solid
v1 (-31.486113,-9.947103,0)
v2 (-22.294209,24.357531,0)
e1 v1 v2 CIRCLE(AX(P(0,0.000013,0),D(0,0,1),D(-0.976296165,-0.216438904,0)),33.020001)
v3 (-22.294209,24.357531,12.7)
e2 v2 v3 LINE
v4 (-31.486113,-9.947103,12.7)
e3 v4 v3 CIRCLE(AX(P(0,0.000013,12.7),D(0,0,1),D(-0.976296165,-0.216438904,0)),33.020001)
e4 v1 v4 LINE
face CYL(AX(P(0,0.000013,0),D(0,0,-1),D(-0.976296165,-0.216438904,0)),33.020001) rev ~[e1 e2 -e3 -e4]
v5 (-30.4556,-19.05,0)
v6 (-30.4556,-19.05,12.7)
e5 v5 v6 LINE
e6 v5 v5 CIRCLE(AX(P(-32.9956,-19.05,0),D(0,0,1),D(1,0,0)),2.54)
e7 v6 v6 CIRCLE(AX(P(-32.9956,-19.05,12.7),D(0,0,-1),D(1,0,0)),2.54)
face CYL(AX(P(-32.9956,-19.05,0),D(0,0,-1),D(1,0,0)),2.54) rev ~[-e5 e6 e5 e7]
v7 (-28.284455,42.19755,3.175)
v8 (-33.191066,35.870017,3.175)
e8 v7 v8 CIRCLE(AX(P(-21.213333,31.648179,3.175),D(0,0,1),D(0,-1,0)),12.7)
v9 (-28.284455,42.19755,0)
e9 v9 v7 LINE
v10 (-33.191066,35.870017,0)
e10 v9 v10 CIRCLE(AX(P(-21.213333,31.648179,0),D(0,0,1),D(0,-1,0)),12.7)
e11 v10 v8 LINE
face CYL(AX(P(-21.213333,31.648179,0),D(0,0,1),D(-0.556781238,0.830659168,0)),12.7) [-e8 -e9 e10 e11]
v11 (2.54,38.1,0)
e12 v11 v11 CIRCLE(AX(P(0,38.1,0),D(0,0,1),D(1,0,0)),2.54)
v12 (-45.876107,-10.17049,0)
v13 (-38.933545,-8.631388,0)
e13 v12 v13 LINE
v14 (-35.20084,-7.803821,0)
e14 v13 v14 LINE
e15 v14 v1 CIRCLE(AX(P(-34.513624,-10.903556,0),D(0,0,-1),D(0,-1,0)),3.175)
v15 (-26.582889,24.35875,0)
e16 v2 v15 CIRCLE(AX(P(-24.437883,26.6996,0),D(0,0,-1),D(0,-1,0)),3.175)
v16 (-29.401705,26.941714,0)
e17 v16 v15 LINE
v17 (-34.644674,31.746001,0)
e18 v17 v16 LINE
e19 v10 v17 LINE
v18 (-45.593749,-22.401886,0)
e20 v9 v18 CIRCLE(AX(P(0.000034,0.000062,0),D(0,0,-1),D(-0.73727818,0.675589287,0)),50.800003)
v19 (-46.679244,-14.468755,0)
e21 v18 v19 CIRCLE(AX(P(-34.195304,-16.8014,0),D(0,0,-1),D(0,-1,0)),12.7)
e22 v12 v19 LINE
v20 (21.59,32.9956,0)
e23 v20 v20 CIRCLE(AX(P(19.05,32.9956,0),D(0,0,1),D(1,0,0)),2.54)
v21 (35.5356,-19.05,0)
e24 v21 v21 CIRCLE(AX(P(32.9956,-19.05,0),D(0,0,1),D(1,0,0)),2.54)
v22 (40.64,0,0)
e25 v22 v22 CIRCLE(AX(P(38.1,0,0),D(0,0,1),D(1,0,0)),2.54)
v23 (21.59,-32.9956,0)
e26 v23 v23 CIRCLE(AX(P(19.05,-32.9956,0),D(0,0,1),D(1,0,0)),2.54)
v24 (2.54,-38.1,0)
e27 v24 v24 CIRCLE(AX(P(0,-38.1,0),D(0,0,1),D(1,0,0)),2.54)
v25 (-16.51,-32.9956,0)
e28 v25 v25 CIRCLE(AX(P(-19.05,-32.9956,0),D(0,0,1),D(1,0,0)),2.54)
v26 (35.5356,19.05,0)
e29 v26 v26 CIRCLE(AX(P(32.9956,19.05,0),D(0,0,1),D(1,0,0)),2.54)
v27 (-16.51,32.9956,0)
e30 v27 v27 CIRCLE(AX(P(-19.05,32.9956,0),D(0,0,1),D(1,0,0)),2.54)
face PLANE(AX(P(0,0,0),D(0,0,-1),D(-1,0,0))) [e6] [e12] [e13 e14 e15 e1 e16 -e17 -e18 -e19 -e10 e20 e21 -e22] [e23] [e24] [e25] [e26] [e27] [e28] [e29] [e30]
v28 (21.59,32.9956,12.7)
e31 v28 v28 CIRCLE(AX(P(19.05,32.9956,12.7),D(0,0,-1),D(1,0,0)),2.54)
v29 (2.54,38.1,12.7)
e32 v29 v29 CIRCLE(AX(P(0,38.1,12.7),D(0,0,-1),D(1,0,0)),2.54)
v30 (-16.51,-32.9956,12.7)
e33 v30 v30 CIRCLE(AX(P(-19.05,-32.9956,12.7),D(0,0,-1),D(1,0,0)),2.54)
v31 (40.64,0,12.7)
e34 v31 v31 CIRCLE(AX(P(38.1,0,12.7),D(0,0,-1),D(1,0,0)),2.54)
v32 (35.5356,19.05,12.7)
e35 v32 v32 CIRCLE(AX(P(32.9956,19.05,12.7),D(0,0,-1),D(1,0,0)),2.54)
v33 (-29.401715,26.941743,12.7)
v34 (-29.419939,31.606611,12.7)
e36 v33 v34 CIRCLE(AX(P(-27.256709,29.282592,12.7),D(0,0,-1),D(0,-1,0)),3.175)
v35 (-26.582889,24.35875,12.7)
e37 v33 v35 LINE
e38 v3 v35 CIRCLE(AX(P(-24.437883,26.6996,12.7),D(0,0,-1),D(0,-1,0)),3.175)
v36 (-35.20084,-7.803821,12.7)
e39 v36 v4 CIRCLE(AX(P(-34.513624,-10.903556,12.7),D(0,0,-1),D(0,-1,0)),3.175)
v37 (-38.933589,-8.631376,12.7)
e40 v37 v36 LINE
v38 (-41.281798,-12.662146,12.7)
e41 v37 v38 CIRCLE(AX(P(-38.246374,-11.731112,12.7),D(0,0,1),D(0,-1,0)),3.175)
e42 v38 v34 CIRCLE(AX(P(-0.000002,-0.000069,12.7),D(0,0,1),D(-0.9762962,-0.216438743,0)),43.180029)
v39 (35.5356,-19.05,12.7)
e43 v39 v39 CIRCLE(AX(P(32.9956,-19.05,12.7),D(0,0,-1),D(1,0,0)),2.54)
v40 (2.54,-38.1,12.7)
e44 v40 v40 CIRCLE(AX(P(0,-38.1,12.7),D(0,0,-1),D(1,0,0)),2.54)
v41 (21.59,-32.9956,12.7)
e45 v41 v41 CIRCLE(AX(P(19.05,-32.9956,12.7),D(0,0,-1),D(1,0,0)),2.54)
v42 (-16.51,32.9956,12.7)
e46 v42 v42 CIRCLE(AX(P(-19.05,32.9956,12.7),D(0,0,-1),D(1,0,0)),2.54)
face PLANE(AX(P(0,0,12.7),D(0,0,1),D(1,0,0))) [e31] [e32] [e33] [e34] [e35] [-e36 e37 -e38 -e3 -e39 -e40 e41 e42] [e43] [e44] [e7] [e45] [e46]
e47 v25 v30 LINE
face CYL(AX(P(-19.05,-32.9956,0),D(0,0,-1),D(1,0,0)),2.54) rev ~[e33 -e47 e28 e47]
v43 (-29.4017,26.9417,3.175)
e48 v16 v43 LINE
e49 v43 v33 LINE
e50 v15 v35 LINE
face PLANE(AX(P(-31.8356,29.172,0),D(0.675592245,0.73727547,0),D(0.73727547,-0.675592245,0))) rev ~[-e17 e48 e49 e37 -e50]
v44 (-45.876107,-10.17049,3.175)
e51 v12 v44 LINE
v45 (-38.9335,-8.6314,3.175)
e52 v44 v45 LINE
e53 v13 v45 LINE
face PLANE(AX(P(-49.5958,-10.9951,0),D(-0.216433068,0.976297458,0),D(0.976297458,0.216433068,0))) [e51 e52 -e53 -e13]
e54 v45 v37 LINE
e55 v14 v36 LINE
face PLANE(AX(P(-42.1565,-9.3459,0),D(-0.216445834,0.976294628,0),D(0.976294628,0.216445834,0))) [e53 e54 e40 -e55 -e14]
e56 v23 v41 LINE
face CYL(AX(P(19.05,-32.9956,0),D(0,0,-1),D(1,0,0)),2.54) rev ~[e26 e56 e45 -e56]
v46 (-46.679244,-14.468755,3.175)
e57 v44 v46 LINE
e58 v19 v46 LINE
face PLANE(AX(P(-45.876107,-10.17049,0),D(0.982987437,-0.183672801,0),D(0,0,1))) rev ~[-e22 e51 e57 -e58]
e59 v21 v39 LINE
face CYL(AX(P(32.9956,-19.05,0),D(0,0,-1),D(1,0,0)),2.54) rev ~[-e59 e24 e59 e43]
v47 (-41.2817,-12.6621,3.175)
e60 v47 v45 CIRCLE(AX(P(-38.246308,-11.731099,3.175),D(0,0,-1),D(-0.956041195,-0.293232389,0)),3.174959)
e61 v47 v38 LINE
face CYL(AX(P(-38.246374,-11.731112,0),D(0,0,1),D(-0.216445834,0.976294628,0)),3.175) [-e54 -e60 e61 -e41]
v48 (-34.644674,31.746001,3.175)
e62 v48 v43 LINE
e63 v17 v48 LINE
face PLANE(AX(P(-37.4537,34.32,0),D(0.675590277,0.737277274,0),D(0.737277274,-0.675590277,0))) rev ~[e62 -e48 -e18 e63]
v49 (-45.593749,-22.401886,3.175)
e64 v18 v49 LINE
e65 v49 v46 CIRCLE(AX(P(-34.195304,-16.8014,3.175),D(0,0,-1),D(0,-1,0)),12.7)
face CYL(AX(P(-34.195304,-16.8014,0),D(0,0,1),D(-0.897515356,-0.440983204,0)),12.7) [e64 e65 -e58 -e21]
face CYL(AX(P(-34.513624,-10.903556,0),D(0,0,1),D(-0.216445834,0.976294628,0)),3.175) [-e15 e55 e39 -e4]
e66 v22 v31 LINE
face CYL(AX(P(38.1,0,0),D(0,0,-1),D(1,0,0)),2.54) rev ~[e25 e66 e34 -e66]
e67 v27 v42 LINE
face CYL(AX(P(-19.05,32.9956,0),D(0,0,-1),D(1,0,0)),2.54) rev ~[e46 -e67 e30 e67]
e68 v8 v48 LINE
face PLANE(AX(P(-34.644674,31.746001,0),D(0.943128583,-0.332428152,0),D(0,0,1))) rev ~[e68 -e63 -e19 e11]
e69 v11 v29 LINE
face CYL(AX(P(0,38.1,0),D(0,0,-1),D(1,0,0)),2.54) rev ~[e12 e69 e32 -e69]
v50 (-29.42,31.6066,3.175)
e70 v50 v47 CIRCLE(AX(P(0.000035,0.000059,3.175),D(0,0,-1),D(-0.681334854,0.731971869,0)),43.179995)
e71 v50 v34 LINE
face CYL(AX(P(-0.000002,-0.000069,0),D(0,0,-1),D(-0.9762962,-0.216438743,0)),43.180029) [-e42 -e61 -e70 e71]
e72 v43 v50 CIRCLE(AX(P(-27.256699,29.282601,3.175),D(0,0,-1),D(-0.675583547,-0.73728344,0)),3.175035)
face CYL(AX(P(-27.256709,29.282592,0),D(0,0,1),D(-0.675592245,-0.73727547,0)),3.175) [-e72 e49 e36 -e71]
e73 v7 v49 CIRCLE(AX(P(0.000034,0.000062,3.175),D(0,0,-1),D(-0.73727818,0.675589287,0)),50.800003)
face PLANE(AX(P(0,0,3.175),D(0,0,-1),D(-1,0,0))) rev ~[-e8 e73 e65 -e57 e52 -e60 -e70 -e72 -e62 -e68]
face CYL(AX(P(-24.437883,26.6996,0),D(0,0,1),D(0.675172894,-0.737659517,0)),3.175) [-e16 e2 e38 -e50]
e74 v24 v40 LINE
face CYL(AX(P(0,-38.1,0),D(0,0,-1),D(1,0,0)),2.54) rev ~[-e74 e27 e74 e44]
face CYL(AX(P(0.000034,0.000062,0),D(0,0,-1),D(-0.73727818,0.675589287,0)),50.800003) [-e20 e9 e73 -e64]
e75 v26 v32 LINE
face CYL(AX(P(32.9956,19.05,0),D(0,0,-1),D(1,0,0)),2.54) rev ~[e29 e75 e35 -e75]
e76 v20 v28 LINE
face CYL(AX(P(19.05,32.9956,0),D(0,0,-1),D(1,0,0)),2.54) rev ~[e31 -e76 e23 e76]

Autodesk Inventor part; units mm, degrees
ref_plane "YZ Plane" through (0, 0, 0) normal (1, 0, 0) x (0, 1, 0)
ref_plane "XZ Plane" through (0, 0, 0) normal (0, 1, 0) x (-1, 0, 0)
ref_plane "XY Plane" through (0, 0, 0) normal (0, 0, 1) x (1, 0, 0)
sketch "Sketch1" plane through (0, 0, 0) normal (0, 0, 1) x (1, 0, 0)
  circle A0 centre (0, 38.1) radius 2.54
  circle A1 centre (-19.05, 32.9956) radius 2.54
  circle A2 centre (-32.9956, 19.05) radius 2.54
  circle A3 centre (-38.1, 0) radius 2.54
  arc A4 (-34.7393, -15.6458) -> (-25.6134, 28.2057) centre (0, 0) ccw
  line L0 (0, 0) -> (-22.4665, 0)
  arc A5 (-42.1565, -9.3459) -> (-31.8356, 29.172) centre (0, 0) ccw
  arc A6 (-32.2373, -7.1468) -> (-24.3449, 22.308) centre (0, 0) ccw
  line L1 (-31.8356, 29.172) -> (-24.3449, 22.308)
  line L2 (-42.1565, -9.3459) -> (-32.2373, -7.1468)
  circle A7 centre (-32.9956, -19.05) radius 2.54
  circle A8 centre (-19.05, -32.9956) radius 2.54
  circle A9 centre (0, -38.1) radius 2.54
  circle A10 centre (19.05, -32.9956) radius 2.54
  circle A11 centre (32.9956, -19.05) radius 2.54
  circle A12 centre (38.1, 0) radius 2.54
  circle A13 centre (32.9956, 19.05) radius 2.54
  circle A14 centre (19.05, 32.9956) radius 2.54
  dimension "d0" = 38.1
  dimension "d3" = 360
  dimension "d5" = 5.08
  dimension "d6" = 5.08
  dimension "d7" = 5.08
  dimension "d8" = 55
  dimension "d9" = 42.5
extrude "Extrusion1" add sketch "Sketch1" along normal blind 12.7 contours L2 A6 L1 A5
fillet "Fillet2" radius 3.175 4 edges at (-31.8356, 29.172, 6.35) (-24.3449, 22.308, 6.35) (-32.2373, -7.1468, 6.35) (-42.1565, -9.3459, 6.35)
sketch "Sketch2" plane through (0, 0, 0) normal (0, 0, -1) x (-1, 0, 0)
  arc A0 (29.42, 31.6066) -> (41.2817, -12.6621) centre (0, 0) ccw projected
  arc A1 (37.4537, 34.32) -> (49.5958, -10.9951) centre (0, 0) ccw
  line L0 (37.4537, 34.32) -> (29.4017, 26.9417)
  line L1 (29.4017, 26.9417) -> (26.5829, 24.3587) projected
  arc A2 (29.4017, 26.9417) -> (29.42, 31.6066) centre (27.2567, 29.2826) ccw projected
  line L2 (35.2008, -7.8038) -> (38.9335, -8.6314) projected
  arc A3 (41.2817, -12.6621) -> (38.9335, -8.6314) centre (38.2463, -11.7311) ccw projected
  line L3 (49.5958, -10.9951) -> (38.9335, -8.6314)
  dimension "d20" = 50.8
extrude "Extrusion2" add sketch "Sketch2" against normal blind 3.175
chamfer "Chamfer3" distance 7.62 distance2 3.81 1 edges at (-37.4537, 34.32, 1.5875) measured on face at (-32.5487, -39.0029, 2.1167)
chamfer "Chamfer4" distance 3.81 distance2 7.62 1 edges at (-49.5958, -10.9951, 1.5875) measured on face at (-36.4451, -8.0797, 5.2917)
fillet "Fillet3" radius 12.7 2 edges at (-47.3933, -18.2899, 1.5875) (-31.8988, 39.5361, 1.5875)
equation "\"d7\" = d6"
properties part number "RotateLimitPlate"
